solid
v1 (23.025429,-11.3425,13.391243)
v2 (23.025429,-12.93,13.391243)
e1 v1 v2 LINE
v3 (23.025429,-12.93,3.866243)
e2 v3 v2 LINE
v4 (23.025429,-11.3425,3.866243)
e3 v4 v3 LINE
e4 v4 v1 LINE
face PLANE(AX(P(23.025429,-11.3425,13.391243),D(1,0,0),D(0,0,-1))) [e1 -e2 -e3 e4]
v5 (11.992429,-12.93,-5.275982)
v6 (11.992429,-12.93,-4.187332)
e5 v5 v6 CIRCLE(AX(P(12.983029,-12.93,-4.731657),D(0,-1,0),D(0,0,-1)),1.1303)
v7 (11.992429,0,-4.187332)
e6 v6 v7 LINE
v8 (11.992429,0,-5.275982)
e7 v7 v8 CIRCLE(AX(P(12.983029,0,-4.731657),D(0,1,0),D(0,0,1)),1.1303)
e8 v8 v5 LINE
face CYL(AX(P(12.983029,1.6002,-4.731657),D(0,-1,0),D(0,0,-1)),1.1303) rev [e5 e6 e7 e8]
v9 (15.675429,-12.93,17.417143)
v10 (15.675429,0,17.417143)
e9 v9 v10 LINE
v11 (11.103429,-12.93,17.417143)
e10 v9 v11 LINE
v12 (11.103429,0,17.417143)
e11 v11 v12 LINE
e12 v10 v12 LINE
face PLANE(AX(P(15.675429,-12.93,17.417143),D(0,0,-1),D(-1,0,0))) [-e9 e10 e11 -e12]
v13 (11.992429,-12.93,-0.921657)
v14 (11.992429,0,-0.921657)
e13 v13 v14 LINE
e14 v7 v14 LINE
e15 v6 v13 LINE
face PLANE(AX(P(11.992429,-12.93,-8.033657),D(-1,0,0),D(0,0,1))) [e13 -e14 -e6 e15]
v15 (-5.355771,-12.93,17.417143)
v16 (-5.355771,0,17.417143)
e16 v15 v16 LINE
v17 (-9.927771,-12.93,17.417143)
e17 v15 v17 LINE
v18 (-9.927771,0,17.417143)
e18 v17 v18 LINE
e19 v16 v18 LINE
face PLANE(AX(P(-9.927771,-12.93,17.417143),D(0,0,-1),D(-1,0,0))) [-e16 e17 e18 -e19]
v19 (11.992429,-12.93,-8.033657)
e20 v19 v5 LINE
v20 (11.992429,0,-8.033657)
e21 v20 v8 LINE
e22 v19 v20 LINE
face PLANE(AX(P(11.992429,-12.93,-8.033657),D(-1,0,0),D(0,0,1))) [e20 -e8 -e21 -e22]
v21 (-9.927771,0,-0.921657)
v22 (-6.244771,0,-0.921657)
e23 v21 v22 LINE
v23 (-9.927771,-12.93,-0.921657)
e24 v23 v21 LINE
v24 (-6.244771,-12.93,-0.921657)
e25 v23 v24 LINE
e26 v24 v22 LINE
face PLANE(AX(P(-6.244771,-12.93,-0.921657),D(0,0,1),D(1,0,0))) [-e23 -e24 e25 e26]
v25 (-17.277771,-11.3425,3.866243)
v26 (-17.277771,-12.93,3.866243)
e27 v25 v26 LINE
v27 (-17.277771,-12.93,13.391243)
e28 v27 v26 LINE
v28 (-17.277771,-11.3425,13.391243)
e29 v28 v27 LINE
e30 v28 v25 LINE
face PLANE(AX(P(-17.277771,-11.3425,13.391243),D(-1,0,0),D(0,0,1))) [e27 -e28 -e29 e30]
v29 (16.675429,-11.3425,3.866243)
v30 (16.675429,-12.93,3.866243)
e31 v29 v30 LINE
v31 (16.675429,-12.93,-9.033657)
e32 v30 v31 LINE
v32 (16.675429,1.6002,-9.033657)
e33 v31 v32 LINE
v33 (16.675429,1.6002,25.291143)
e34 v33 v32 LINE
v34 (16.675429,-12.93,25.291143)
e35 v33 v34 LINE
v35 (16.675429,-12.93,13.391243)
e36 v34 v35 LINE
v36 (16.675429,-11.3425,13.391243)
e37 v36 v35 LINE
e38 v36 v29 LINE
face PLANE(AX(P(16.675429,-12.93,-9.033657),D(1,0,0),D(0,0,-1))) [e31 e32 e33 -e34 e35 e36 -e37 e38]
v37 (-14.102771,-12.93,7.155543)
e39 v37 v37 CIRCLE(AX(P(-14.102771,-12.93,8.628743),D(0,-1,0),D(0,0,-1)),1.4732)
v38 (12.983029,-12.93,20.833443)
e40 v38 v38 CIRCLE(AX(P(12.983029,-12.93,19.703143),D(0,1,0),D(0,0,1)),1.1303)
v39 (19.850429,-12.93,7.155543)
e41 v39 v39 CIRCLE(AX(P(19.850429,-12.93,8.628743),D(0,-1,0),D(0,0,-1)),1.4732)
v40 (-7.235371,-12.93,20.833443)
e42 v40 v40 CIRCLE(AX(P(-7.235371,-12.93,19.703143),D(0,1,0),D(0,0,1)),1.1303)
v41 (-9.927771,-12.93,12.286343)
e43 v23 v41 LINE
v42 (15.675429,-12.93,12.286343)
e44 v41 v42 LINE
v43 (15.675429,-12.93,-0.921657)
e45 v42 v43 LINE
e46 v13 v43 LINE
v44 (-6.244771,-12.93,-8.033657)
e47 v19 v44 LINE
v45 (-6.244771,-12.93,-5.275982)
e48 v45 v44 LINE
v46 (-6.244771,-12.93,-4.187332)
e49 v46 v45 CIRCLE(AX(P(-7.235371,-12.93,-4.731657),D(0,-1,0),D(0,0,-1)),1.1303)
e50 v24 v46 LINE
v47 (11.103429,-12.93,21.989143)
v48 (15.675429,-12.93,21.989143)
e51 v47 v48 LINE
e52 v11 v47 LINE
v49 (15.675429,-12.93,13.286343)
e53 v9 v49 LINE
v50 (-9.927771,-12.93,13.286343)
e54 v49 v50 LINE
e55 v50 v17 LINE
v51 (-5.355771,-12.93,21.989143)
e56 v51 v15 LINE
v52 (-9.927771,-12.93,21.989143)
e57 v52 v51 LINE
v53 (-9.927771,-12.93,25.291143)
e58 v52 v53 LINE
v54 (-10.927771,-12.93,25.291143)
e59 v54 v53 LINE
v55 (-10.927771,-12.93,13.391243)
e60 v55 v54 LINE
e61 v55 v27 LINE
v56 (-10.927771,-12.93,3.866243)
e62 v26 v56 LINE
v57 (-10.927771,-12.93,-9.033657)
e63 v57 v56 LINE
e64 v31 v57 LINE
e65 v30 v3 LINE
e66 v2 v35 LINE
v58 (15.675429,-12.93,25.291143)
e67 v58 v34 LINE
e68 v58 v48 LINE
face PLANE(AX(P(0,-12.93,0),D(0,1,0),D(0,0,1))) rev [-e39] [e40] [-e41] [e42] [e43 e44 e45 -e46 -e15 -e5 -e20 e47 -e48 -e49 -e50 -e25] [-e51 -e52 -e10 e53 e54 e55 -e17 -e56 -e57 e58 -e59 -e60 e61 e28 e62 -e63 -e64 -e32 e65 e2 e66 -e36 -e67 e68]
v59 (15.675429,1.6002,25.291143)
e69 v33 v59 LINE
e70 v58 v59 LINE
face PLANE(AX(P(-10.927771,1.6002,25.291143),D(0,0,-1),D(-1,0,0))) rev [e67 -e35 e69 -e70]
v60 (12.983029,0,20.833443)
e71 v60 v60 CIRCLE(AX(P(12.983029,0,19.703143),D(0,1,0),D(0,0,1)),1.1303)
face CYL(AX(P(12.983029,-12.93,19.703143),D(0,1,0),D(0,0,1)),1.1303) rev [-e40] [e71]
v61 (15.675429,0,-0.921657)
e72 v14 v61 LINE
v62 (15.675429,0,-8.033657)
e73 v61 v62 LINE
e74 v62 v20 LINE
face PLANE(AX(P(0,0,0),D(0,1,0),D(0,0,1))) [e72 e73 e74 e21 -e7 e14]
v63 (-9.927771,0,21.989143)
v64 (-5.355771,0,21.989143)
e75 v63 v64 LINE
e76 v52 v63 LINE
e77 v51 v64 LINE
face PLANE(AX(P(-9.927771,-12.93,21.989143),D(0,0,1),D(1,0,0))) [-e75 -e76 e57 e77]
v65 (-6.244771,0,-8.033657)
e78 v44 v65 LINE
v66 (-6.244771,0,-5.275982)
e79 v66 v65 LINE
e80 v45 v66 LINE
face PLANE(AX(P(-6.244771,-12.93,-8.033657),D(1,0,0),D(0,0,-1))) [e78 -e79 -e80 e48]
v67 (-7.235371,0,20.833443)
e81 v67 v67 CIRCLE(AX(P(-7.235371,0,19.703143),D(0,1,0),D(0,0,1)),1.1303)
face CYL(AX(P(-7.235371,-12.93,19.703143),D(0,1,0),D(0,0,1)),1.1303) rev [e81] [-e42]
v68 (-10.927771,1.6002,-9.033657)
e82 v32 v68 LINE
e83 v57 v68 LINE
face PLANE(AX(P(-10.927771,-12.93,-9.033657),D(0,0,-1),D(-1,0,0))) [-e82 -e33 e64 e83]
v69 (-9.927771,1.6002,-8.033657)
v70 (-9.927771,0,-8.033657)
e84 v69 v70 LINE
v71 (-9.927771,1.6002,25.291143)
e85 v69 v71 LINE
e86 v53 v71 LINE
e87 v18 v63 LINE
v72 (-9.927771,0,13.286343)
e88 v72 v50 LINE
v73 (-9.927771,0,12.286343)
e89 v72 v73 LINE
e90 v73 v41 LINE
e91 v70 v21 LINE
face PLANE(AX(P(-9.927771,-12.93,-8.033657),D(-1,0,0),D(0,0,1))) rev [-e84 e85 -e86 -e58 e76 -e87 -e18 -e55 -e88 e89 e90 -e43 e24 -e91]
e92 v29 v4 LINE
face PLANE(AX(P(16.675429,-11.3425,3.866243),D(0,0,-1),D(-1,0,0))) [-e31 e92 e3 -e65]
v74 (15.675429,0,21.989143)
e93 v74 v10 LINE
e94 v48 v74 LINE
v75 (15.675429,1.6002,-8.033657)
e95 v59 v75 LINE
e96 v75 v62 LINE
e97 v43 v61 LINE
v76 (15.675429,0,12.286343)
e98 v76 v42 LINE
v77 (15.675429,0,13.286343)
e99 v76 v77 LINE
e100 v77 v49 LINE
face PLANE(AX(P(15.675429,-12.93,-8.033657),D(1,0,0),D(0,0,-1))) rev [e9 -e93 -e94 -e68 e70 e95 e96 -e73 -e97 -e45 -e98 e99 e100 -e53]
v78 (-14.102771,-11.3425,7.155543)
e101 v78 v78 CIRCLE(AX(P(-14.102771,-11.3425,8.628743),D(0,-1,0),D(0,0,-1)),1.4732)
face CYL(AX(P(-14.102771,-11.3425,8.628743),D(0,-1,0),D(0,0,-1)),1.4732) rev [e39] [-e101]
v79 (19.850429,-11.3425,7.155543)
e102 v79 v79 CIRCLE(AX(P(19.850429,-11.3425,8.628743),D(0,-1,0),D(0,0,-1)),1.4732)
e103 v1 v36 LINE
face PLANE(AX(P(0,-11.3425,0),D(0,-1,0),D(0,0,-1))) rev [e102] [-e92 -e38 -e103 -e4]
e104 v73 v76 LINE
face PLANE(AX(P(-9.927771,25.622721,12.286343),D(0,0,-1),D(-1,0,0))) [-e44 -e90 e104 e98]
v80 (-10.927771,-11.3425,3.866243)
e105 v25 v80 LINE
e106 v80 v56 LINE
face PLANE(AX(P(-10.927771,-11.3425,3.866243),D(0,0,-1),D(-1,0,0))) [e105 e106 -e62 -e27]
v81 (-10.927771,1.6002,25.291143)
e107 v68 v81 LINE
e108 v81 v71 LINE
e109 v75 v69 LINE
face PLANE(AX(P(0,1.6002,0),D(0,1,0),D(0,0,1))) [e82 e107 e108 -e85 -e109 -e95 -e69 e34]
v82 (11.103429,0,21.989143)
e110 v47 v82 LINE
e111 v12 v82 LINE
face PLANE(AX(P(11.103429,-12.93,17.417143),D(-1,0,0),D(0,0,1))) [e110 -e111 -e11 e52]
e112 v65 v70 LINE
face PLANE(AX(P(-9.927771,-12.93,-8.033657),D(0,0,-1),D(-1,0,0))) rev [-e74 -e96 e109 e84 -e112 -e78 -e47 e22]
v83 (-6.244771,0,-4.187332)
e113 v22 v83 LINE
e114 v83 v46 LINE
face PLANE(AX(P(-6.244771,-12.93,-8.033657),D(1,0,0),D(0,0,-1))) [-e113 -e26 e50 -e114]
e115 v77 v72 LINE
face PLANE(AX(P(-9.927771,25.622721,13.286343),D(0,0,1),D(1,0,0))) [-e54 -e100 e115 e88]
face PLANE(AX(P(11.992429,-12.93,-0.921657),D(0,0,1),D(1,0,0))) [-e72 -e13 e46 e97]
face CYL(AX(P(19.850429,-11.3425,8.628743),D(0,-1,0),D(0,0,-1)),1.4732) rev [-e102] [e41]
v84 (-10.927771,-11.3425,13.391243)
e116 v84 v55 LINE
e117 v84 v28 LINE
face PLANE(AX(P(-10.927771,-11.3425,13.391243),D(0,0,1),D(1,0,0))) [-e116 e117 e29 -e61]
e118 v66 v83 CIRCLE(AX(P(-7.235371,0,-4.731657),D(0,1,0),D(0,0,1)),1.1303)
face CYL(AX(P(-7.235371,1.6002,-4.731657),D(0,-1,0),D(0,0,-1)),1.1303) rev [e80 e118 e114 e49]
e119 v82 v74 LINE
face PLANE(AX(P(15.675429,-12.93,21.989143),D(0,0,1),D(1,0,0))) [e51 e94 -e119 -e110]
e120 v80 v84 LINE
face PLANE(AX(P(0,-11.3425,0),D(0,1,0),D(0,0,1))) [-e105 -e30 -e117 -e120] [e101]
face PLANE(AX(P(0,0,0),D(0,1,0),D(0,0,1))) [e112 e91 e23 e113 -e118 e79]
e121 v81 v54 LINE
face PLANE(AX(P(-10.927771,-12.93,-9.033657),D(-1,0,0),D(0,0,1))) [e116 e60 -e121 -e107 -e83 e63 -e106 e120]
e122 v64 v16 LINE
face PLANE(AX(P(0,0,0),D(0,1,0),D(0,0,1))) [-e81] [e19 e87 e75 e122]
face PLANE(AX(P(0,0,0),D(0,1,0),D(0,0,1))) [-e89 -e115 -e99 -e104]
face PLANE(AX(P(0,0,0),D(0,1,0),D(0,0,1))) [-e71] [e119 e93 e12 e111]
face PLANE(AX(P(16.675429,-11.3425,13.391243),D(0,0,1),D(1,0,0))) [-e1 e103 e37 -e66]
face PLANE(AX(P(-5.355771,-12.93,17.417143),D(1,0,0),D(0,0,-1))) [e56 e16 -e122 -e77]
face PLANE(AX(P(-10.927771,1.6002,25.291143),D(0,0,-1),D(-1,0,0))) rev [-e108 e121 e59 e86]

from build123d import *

# Parameters (mm, degrees)
SKETCH1_W           = 27.6032
SKETCH1_H           = 35.3248
SKETCH1_W_2         = 25.6032
SKETCH1_H_2         = 33.3248
MAINCASING_DEPTH    = 12.93
SKETCH2_W           = 6.35
SKETCH2_H           = 9.525
SKETCH2_R           = 1.4732
MOUNTINGTABS_DEPTH  = 1.5875
SKETCH3_W           = 3.683
SKETCH3_H           = 7.112
SKETCH3_W_2         = 4.572
SKETCH3_H_2         = 4.572
SKETCH3_R           = 1.1303
BOSS_EXTRUDE3_DEPTH = 12.93
SKETCH4_W           = 27.6032
SKETCH4_H           = 35.3248
SKETCH4_W_2         = 25.6032
SKETCH4_H_2         = 33.3248
BOSS_EXTRUDE4_DEPTH = 1.6002
SKETCH5_R           = 1.1303
UPPERHOLES_DEPTH    = 38.848662667
SKETCH6_W           = 25.6032
SKETCH6_H           = 1
BOSS_EXTRUDE5_DEPTH = 12.93
SKETCH7_W           = 27.6032
SKETCH7_H           = 1
CUT_EXTRUDE2_DEPTH  = 38.848662667


with BuildPart() as part:
    # Sketch1 → mainCasing (new body)
    with BuildSketch(Plane(origin=(0, 0, 0), x_dir=(1, 0, 0), z_dir=(0, 1, 0))):
        with Locations((2.873828571, -8.628742857)):
            Rectangle(SKETCH1_W, SKETCH1_H)
        with Locations((2.873828571, -8.628742857)):
            Rectangle(SKETCH1_W_2, SKETCH1_H_2, mode=Mode.SUBTRACT)
    extrude(amount=-MAINCASING_DEPTH)

    # Sketch2 → mountingTabs (add)
    # profile 1 of 2: a face of its own
    with BuildSketch(Plane.XZ.offset(12.93)):
        with Locations((-14.102771429, 8.628742857)):
            Rectangle(SKETCH2_W, SKETCH2_H)
        with Locations(Location((-14.102771429, 8.628742857, 0), (0, 0, 270))):
            Circle(SKETCH2_R, mode=Mode.SUBTRACT)
    # profile 2 of 2: a face of its own
    with BuildSketch(Plane.XZ.offset(12.93)):
        with Locations((19.850428571, 8.628742857)):
            Rectangle(SKETCH2_W, SKETCH2_H)
        with Locations(Location((19.850428571, 8.628742857, 0), (0, 0, 270))):
            Circle(SKETCH2_R, mode=Mode.SUBTRACT)
    extrude(amount=-MOUNTINGTABS_DEPTH)

    # Sketch3 → Boss-Extrude3 (add)
    # profile 1 of 4: a face of its own
    with BuildSketch(Plane(origin=(0, 0, 0), x_dir=(1, 0, 0), z_dir=(0, 1, 0))):
        with Locations((-8.086271429, 4.477657143)):
            Rectangle(SKETCH3_W, SKETCH3_H)
    # profile 2 of 4: a face of its own
    with BuildSketch(Plane(origin=(0, 0, 0), x_dir=(1, 0, 0), z_dir=(0, 1, 0))):
        with Locations((13.833928571, 4.477657143)):
            Rectangle(SKETCH3_W, SKETCH3_H)
    # profile 3 of 4: a face of its own
    with BuildSketch(Plane(origin=(0, 0, 0), x_dir=(1, 0, 0), z_dir=(0, 1, 0))):
        with Locations((-7.641771429, -19.703142857)):
            Rectangle(SKETCH3_W_2, SKETCH3_H_2)
        with Locations(Location((-7.235371429, -19.703142857, 0), (0, 0, 270))):
            Circle(SKETCH3_R, mode=Mode.SUBTRACT)
    # profile 4 of 4: a face of its own
    with BuildSketch(Plane(origin=(0, 0, 0), x_dir=(1, 0, 0), z_dir=(0, 1, 0))):
        with Locations((13.389428571, -19.703142857)):
            Rectangle(SKETCH3_W_2, SKETCH3_H_2)
        with Locations(Location((12.983028571, -19.703142857, 0), (0, 0, 270))):
            Circle(SKETCH3_R, mode=Mode.SUBTRACT)
    extrude(amount=-BOSS_EXTRUDE3_DEPTH)

    # Sketch4 → Boss-Extrude4 (add)
    with BuildSketch(Plane(origin=(0, 0, 0), x_dir=(1, 0, 0), z_dir=(0, 1, 0))):
        with Locations((2.873828571, -8.628742857)):
            Rectangle(SKETCH4_W, SKETCH4_H)
        with Locations((2.873828571, -8.628742857)):
            Rectangle(SKETCH4_W_2, SKETCH4_H_2, mode=Mode.SUBTRACT)
    extrude(amount=BOSS_EXTRUDE4_DEPTH)

    # Sketch5 → upperHoles (cut, through all)
    with BuildSketch(Plane.XZ.offset(12.93)):
        with Locations((-7.235371429, -4.731657143)):
            Circle(SKETCH5_R)
        with Locations((12.983028571, -4.731657143)):
            Circle(SKETCH5_R)
    extrude(amount=-UPPERHOLES_DEPTH, mode=Mode.SUBTRACT)

    # Sketch6 → Boss-Extrude5 (add)
    with BuildSketch(Plane.XZ.offset(12.93)):
        with Locations((2.873828571, 12.786342857)):
            Rectangle(SKETCH6_W, SKETCH6_H)
    extrude(amount=-BOSS_EXTRUDE5_DEPTH)

    # Sketch7 → Cut-Extrude2 (cut, through all)
    with BuildSketch(Plane.XZ.offset(12.93)):
        with Locations((2.873828571, 25.791142857)):
            Rectangle(SKETCH7_W, SKETCH7_H)
    extrude(amount=-CUT_EXTRUDE2_DEPTH, mode=Mode.SUBTRACT)


solid = part.part
